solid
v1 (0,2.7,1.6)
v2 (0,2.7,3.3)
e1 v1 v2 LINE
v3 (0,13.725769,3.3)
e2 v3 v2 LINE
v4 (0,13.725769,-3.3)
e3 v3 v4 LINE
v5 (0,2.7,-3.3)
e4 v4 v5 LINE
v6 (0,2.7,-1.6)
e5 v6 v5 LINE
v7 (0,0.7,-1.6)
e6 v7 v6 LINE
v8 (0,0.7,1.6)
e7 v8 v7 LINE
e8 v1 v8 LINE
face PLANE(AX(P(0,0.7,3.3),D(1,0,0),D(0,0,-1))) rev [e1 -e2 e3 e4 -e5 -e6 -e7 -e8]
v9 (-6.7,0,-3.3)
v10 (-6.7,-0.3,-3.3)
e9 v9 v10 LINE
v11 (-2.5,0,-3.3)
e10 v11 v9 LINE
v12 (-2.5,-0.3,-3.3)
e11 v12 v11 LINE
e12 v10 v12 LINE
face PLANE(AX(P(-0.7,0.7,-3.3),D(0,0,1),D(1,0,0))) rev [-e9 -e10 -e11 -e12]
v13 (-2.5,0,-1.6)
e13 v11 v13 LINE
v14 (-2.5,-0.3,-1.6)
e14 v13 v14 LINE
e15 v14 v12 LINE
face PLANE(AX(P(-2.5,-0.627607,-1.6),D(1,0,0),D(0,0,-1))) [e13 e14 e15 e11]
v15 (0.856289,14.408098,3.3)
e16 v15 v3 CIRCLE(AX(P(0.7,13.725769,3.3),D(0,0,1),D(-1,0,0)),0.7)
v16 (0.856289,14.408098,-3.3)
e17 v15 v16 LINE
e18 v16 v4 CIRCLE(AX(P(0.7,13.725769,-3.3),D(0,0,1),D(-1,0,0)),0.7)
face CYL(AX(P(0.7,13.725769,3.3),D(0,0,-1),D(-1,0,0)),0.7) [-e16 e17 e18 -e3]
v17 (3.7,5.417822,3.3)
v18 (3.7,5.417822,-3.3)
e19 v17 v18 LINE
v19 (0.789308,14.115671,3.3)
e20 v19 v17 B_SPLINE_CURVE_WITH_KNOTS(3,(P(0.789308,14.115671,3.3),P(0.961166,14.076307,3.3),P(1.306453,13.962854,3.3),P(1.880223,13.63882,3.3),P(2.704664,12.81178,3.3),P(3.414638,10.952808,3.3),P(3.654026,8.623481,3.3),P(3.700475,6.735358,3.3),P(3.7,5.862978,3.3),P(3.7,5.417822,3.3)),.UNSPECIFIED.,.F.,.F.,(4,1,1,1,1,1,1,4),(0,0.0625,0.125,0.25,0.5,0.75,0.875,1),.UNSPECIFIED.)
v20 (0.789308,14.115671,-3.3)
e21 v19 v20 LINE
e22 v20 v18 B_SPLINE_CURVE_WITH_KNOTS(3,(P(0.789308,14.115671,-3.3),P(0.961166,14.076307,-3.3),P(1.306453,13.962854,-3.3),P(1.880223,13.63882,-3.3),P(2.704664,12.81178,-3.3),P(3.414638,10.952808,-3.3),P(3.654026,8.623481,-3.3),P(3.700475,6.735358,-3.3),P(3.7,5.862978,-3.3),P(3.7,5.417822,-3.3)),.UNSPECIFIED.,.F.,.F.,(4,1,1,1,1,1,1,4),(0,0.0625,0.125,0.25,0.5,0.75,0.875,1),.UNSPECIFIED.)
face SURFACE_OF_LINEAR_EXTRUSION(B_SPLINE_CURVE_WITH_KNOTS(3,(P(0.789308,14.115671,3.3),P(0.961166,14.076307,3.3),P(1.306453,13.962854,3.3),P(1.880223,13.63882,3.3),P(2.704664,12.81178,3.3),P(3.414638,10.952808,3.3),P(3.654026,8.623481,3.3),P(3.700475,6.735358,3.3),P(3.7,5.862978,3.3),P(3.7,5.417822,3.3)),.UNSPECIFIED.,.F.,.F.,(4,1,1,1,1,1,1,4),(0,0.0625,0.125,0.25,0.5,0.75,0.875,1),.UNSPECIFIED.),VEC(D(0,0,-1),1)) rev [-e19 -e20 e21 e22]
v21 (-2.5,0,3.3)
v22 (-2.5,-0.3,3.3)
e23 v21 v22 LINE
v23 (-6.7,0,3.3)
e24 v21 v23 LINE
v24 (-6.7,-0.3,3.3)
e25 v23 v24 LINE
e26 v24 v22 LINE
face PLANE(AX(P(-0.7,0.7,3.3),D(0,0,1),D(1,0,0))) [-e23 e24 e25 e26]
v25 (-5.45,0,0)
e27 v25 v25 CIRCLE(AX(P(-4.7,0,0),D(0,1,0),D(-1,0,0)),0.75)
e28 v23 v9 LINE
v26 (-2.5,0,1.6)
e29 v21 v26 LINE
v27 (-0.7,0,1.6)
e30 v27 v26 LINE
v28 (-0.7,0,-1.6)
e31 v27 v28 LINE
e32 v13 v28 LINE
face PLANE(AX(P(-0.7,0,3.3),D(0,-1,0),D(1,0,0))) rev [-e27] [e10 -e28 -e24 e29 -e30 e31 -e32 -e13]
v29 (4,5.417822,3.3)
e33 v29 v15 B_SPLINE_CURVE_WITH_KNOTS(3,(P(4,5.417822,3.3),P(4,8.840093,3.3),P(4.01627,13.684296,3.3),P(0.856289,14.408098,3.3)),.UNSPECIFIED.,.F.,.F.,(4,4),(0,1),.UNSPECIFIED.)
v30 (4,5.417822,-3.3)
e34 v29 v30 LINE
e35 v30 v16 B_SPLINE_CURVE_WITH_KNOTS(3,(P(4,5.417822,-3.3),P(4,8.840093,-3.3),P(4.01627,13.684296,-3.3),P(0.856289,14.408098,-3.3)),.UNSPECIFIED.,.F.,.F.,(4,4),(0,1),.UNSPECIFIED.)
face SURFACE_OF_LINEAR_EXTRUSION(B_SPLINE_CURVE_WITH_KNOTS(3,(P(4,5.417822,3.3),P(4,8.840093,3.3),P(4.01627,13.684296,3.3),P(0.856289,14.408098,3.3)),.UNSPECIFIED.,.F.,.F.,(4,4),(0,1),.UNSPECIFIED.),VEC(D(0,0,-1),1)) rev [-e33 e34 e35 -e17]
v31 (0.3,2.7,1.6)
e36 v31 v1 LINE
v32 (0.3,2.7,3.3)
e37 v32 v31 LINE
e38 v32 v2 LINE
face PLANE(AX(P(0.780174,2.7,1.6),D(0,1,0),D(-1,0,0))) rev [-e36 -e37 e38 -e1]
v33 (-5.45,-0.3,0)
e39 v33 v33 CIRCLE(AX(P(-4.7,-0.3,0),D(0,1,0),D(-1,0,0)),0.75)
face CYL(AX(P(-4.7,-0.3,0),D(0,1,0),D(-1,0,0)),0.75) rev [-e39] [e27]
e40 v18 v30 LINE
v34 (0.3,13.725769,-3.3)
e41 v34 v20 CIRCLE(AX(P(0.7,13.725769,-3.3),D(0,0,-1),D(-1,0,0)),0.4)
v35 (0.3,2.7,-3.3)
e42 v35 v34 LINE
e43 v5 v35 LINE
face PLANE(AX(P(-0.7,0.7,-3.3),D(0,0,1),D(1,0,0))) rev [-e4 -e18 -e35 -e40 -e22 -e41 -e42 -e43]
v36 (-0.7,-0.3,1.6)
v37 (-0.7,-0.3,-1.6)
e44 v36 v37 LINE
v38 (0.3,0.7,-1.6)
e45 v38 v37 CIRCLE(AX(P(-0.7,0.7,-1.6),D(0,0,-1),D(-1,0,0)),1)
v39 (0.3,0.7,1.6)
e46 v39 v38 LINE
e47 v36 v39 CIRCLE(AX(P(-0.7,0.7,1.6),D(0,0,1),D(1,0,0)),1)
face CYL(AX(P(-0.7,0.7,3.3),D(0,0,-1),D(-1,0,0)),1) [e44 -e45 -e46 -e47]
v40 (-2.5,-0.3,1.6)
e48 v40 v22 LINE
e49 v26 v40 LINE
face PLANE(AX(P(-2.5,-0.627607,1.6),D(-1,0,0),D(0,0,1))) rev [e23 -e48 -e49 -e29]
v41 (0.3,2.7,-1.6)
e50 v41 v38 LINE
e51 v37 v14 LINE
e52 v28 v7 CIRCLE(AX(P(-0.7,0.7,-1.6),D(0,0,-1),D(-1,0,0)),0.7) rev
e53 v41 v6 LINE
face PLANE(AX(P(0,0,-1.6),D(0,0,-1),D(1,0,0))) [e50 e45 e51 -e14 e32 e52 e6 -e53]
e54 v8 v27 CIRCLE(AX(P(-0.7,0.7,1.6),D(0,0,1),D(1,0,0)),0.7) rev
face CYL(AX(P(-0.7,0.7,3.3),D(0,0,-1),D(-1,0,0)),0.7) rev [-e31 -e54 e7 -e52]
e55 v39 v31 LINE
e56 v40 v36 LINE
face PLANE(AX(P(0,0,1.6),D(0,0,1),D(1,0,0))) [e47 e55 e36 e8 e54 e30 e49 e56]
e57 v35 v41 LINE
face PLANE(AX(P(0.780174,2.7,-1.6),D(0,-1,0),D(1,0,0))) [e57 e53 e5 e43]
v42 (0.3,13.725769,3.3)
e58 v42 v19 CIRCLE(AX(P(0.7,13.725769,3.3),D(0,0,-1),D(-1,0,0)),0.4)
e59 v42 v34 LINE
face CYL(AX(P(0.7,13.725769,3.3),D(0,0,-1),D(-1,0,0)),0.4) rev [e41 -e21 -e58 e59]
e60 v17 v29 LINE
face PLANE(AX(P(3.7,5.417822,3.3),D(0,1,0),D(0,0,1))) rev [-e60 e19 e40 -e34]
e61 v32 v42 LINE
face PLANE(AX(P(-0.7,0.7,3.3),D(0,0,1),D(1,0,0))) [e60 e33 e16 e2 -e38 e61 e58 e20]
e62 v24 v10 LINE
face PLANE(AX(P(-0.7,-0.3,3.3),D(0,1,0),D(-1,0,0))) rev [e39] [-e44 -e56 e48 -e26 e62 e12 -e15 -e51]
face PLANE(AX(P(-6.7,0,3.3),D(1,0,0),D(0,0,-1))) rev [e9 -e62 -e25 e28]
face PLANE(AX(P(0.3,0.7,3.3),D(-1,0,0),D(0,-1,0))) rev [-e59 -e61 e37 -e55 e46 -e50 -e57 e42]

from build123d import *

# Parameters (mm, degrees)
BOSS_EXTRUDE1_START = -3.3
BOSS_EXTRUDE1_DEPTH = 6.6
SKETCH2_W           = 3.280173546
SKETCH2_H           = 3.327606579
CUT_EXTRUDE1_DEPTH  = 1.7
SKETCH3_R           = 0.75
CUT_EXTRUDE2_DEPTH  = 17.244469999


# Read off the part's stored shape, not the designer's step: Boss-Extrude1
with BuildPart() as part:
    # Boss-Extrude1 outline → Boss-Extrude1 (new body)
    with BuildSketch(Plane.XY.offset(BOSS_EXTRUDE1_START)):
        with BuildLine():
            Line((-6.7, 0), (-6.7, -0.3))
            Line((-6.7, -0.3), (-0.7, -0.3))
            ThreePointArc((-0.7, -0.3), (0.007106781, -0.007106781), (0.3, 0.7))
            Line((0.3, 0.7), (0.3, 13.725768681))
            ThreePointArc((0.3, 13.725768681), (0.450724342, 14.038597142), (0.789308232, 14.115671283))
            add(Edge.make_bspline(
                [(0.789308232, 14.115671283), (0.961165962, 14.076306812), (1.306452594, 13.962853815), (1.880223168, 13.63882047), (2.704664131, 12.811779549), (3.414638461, 10.952808053), (3.654025925, 8.623480967), (3.700475397, 6.735358197), (3.7, 5.862977701), (3.7, 5.417821782)],
                knots=[0, 0, 0, 0, 0.0625, 0.125, 0.25, 0.5, 0.75, 0.875, 1, 1, 1, 1], degree=3))
            Line((3.7, 5.417821782), (4, 5.417821782))
            add(Edge.make_bspline(
                [(4, 5.417821782), (4, 8.840093463), (4.016269814, 13.684296285), (0.856289406, 14.408098235)],
                knots=[0, 0, 0, 0, 1, 1, 1, 1], degree=3))
            ThreePointArc((0.856289406, 14.408098235), (0.263767599, 14.273218489), (0, 13.725768681))
            Line((0, 13.725768681), (0, 0.7))
            ThreePointArc((0, 0.7), (-0.205025253, 0.205025253), (-0.7, 0))
            Line((-0.7, 0), (-6.7, 0))
        make_face()
    extrude(amount=BOSS_EXTRUDE1_DEPTH)

    # Sketch2 → Cut-Extrude1 (cut)
    with BuildSketch(Plane.XY.offset(3.3)):
        with Locations((-0.859913227, 1.036196711)):
            Rectangle(SKETCH2_W, SKETCH2_H)
    cut_extrude1 = extrude(amount=-CUT_EXTRUDE1_DEPTH, mode=Mode.SUBTRACT)

    # Mirror1: Cut-Extrude1 across plane
    add(cut_extrude1.mirror(Plane.XY), mode=Mode.SUBTRACT)

    # Sketch3 → Cut-Extrude2 (cut, through all)
    with BuildSketch(Plane(origin=(0, 0, 0), x_dir=(1, 0, 0), z_dir=(0, 1, 0))):
        with Locations(Location((-4.7, 0, 0), (0, 0, 180))):
            Circle(SKETCH3_R)
    extrude(amount=-CUT_EXTRUDE2_DEPTH, mode=Mode.SUBTRACT)


solid = part.part
